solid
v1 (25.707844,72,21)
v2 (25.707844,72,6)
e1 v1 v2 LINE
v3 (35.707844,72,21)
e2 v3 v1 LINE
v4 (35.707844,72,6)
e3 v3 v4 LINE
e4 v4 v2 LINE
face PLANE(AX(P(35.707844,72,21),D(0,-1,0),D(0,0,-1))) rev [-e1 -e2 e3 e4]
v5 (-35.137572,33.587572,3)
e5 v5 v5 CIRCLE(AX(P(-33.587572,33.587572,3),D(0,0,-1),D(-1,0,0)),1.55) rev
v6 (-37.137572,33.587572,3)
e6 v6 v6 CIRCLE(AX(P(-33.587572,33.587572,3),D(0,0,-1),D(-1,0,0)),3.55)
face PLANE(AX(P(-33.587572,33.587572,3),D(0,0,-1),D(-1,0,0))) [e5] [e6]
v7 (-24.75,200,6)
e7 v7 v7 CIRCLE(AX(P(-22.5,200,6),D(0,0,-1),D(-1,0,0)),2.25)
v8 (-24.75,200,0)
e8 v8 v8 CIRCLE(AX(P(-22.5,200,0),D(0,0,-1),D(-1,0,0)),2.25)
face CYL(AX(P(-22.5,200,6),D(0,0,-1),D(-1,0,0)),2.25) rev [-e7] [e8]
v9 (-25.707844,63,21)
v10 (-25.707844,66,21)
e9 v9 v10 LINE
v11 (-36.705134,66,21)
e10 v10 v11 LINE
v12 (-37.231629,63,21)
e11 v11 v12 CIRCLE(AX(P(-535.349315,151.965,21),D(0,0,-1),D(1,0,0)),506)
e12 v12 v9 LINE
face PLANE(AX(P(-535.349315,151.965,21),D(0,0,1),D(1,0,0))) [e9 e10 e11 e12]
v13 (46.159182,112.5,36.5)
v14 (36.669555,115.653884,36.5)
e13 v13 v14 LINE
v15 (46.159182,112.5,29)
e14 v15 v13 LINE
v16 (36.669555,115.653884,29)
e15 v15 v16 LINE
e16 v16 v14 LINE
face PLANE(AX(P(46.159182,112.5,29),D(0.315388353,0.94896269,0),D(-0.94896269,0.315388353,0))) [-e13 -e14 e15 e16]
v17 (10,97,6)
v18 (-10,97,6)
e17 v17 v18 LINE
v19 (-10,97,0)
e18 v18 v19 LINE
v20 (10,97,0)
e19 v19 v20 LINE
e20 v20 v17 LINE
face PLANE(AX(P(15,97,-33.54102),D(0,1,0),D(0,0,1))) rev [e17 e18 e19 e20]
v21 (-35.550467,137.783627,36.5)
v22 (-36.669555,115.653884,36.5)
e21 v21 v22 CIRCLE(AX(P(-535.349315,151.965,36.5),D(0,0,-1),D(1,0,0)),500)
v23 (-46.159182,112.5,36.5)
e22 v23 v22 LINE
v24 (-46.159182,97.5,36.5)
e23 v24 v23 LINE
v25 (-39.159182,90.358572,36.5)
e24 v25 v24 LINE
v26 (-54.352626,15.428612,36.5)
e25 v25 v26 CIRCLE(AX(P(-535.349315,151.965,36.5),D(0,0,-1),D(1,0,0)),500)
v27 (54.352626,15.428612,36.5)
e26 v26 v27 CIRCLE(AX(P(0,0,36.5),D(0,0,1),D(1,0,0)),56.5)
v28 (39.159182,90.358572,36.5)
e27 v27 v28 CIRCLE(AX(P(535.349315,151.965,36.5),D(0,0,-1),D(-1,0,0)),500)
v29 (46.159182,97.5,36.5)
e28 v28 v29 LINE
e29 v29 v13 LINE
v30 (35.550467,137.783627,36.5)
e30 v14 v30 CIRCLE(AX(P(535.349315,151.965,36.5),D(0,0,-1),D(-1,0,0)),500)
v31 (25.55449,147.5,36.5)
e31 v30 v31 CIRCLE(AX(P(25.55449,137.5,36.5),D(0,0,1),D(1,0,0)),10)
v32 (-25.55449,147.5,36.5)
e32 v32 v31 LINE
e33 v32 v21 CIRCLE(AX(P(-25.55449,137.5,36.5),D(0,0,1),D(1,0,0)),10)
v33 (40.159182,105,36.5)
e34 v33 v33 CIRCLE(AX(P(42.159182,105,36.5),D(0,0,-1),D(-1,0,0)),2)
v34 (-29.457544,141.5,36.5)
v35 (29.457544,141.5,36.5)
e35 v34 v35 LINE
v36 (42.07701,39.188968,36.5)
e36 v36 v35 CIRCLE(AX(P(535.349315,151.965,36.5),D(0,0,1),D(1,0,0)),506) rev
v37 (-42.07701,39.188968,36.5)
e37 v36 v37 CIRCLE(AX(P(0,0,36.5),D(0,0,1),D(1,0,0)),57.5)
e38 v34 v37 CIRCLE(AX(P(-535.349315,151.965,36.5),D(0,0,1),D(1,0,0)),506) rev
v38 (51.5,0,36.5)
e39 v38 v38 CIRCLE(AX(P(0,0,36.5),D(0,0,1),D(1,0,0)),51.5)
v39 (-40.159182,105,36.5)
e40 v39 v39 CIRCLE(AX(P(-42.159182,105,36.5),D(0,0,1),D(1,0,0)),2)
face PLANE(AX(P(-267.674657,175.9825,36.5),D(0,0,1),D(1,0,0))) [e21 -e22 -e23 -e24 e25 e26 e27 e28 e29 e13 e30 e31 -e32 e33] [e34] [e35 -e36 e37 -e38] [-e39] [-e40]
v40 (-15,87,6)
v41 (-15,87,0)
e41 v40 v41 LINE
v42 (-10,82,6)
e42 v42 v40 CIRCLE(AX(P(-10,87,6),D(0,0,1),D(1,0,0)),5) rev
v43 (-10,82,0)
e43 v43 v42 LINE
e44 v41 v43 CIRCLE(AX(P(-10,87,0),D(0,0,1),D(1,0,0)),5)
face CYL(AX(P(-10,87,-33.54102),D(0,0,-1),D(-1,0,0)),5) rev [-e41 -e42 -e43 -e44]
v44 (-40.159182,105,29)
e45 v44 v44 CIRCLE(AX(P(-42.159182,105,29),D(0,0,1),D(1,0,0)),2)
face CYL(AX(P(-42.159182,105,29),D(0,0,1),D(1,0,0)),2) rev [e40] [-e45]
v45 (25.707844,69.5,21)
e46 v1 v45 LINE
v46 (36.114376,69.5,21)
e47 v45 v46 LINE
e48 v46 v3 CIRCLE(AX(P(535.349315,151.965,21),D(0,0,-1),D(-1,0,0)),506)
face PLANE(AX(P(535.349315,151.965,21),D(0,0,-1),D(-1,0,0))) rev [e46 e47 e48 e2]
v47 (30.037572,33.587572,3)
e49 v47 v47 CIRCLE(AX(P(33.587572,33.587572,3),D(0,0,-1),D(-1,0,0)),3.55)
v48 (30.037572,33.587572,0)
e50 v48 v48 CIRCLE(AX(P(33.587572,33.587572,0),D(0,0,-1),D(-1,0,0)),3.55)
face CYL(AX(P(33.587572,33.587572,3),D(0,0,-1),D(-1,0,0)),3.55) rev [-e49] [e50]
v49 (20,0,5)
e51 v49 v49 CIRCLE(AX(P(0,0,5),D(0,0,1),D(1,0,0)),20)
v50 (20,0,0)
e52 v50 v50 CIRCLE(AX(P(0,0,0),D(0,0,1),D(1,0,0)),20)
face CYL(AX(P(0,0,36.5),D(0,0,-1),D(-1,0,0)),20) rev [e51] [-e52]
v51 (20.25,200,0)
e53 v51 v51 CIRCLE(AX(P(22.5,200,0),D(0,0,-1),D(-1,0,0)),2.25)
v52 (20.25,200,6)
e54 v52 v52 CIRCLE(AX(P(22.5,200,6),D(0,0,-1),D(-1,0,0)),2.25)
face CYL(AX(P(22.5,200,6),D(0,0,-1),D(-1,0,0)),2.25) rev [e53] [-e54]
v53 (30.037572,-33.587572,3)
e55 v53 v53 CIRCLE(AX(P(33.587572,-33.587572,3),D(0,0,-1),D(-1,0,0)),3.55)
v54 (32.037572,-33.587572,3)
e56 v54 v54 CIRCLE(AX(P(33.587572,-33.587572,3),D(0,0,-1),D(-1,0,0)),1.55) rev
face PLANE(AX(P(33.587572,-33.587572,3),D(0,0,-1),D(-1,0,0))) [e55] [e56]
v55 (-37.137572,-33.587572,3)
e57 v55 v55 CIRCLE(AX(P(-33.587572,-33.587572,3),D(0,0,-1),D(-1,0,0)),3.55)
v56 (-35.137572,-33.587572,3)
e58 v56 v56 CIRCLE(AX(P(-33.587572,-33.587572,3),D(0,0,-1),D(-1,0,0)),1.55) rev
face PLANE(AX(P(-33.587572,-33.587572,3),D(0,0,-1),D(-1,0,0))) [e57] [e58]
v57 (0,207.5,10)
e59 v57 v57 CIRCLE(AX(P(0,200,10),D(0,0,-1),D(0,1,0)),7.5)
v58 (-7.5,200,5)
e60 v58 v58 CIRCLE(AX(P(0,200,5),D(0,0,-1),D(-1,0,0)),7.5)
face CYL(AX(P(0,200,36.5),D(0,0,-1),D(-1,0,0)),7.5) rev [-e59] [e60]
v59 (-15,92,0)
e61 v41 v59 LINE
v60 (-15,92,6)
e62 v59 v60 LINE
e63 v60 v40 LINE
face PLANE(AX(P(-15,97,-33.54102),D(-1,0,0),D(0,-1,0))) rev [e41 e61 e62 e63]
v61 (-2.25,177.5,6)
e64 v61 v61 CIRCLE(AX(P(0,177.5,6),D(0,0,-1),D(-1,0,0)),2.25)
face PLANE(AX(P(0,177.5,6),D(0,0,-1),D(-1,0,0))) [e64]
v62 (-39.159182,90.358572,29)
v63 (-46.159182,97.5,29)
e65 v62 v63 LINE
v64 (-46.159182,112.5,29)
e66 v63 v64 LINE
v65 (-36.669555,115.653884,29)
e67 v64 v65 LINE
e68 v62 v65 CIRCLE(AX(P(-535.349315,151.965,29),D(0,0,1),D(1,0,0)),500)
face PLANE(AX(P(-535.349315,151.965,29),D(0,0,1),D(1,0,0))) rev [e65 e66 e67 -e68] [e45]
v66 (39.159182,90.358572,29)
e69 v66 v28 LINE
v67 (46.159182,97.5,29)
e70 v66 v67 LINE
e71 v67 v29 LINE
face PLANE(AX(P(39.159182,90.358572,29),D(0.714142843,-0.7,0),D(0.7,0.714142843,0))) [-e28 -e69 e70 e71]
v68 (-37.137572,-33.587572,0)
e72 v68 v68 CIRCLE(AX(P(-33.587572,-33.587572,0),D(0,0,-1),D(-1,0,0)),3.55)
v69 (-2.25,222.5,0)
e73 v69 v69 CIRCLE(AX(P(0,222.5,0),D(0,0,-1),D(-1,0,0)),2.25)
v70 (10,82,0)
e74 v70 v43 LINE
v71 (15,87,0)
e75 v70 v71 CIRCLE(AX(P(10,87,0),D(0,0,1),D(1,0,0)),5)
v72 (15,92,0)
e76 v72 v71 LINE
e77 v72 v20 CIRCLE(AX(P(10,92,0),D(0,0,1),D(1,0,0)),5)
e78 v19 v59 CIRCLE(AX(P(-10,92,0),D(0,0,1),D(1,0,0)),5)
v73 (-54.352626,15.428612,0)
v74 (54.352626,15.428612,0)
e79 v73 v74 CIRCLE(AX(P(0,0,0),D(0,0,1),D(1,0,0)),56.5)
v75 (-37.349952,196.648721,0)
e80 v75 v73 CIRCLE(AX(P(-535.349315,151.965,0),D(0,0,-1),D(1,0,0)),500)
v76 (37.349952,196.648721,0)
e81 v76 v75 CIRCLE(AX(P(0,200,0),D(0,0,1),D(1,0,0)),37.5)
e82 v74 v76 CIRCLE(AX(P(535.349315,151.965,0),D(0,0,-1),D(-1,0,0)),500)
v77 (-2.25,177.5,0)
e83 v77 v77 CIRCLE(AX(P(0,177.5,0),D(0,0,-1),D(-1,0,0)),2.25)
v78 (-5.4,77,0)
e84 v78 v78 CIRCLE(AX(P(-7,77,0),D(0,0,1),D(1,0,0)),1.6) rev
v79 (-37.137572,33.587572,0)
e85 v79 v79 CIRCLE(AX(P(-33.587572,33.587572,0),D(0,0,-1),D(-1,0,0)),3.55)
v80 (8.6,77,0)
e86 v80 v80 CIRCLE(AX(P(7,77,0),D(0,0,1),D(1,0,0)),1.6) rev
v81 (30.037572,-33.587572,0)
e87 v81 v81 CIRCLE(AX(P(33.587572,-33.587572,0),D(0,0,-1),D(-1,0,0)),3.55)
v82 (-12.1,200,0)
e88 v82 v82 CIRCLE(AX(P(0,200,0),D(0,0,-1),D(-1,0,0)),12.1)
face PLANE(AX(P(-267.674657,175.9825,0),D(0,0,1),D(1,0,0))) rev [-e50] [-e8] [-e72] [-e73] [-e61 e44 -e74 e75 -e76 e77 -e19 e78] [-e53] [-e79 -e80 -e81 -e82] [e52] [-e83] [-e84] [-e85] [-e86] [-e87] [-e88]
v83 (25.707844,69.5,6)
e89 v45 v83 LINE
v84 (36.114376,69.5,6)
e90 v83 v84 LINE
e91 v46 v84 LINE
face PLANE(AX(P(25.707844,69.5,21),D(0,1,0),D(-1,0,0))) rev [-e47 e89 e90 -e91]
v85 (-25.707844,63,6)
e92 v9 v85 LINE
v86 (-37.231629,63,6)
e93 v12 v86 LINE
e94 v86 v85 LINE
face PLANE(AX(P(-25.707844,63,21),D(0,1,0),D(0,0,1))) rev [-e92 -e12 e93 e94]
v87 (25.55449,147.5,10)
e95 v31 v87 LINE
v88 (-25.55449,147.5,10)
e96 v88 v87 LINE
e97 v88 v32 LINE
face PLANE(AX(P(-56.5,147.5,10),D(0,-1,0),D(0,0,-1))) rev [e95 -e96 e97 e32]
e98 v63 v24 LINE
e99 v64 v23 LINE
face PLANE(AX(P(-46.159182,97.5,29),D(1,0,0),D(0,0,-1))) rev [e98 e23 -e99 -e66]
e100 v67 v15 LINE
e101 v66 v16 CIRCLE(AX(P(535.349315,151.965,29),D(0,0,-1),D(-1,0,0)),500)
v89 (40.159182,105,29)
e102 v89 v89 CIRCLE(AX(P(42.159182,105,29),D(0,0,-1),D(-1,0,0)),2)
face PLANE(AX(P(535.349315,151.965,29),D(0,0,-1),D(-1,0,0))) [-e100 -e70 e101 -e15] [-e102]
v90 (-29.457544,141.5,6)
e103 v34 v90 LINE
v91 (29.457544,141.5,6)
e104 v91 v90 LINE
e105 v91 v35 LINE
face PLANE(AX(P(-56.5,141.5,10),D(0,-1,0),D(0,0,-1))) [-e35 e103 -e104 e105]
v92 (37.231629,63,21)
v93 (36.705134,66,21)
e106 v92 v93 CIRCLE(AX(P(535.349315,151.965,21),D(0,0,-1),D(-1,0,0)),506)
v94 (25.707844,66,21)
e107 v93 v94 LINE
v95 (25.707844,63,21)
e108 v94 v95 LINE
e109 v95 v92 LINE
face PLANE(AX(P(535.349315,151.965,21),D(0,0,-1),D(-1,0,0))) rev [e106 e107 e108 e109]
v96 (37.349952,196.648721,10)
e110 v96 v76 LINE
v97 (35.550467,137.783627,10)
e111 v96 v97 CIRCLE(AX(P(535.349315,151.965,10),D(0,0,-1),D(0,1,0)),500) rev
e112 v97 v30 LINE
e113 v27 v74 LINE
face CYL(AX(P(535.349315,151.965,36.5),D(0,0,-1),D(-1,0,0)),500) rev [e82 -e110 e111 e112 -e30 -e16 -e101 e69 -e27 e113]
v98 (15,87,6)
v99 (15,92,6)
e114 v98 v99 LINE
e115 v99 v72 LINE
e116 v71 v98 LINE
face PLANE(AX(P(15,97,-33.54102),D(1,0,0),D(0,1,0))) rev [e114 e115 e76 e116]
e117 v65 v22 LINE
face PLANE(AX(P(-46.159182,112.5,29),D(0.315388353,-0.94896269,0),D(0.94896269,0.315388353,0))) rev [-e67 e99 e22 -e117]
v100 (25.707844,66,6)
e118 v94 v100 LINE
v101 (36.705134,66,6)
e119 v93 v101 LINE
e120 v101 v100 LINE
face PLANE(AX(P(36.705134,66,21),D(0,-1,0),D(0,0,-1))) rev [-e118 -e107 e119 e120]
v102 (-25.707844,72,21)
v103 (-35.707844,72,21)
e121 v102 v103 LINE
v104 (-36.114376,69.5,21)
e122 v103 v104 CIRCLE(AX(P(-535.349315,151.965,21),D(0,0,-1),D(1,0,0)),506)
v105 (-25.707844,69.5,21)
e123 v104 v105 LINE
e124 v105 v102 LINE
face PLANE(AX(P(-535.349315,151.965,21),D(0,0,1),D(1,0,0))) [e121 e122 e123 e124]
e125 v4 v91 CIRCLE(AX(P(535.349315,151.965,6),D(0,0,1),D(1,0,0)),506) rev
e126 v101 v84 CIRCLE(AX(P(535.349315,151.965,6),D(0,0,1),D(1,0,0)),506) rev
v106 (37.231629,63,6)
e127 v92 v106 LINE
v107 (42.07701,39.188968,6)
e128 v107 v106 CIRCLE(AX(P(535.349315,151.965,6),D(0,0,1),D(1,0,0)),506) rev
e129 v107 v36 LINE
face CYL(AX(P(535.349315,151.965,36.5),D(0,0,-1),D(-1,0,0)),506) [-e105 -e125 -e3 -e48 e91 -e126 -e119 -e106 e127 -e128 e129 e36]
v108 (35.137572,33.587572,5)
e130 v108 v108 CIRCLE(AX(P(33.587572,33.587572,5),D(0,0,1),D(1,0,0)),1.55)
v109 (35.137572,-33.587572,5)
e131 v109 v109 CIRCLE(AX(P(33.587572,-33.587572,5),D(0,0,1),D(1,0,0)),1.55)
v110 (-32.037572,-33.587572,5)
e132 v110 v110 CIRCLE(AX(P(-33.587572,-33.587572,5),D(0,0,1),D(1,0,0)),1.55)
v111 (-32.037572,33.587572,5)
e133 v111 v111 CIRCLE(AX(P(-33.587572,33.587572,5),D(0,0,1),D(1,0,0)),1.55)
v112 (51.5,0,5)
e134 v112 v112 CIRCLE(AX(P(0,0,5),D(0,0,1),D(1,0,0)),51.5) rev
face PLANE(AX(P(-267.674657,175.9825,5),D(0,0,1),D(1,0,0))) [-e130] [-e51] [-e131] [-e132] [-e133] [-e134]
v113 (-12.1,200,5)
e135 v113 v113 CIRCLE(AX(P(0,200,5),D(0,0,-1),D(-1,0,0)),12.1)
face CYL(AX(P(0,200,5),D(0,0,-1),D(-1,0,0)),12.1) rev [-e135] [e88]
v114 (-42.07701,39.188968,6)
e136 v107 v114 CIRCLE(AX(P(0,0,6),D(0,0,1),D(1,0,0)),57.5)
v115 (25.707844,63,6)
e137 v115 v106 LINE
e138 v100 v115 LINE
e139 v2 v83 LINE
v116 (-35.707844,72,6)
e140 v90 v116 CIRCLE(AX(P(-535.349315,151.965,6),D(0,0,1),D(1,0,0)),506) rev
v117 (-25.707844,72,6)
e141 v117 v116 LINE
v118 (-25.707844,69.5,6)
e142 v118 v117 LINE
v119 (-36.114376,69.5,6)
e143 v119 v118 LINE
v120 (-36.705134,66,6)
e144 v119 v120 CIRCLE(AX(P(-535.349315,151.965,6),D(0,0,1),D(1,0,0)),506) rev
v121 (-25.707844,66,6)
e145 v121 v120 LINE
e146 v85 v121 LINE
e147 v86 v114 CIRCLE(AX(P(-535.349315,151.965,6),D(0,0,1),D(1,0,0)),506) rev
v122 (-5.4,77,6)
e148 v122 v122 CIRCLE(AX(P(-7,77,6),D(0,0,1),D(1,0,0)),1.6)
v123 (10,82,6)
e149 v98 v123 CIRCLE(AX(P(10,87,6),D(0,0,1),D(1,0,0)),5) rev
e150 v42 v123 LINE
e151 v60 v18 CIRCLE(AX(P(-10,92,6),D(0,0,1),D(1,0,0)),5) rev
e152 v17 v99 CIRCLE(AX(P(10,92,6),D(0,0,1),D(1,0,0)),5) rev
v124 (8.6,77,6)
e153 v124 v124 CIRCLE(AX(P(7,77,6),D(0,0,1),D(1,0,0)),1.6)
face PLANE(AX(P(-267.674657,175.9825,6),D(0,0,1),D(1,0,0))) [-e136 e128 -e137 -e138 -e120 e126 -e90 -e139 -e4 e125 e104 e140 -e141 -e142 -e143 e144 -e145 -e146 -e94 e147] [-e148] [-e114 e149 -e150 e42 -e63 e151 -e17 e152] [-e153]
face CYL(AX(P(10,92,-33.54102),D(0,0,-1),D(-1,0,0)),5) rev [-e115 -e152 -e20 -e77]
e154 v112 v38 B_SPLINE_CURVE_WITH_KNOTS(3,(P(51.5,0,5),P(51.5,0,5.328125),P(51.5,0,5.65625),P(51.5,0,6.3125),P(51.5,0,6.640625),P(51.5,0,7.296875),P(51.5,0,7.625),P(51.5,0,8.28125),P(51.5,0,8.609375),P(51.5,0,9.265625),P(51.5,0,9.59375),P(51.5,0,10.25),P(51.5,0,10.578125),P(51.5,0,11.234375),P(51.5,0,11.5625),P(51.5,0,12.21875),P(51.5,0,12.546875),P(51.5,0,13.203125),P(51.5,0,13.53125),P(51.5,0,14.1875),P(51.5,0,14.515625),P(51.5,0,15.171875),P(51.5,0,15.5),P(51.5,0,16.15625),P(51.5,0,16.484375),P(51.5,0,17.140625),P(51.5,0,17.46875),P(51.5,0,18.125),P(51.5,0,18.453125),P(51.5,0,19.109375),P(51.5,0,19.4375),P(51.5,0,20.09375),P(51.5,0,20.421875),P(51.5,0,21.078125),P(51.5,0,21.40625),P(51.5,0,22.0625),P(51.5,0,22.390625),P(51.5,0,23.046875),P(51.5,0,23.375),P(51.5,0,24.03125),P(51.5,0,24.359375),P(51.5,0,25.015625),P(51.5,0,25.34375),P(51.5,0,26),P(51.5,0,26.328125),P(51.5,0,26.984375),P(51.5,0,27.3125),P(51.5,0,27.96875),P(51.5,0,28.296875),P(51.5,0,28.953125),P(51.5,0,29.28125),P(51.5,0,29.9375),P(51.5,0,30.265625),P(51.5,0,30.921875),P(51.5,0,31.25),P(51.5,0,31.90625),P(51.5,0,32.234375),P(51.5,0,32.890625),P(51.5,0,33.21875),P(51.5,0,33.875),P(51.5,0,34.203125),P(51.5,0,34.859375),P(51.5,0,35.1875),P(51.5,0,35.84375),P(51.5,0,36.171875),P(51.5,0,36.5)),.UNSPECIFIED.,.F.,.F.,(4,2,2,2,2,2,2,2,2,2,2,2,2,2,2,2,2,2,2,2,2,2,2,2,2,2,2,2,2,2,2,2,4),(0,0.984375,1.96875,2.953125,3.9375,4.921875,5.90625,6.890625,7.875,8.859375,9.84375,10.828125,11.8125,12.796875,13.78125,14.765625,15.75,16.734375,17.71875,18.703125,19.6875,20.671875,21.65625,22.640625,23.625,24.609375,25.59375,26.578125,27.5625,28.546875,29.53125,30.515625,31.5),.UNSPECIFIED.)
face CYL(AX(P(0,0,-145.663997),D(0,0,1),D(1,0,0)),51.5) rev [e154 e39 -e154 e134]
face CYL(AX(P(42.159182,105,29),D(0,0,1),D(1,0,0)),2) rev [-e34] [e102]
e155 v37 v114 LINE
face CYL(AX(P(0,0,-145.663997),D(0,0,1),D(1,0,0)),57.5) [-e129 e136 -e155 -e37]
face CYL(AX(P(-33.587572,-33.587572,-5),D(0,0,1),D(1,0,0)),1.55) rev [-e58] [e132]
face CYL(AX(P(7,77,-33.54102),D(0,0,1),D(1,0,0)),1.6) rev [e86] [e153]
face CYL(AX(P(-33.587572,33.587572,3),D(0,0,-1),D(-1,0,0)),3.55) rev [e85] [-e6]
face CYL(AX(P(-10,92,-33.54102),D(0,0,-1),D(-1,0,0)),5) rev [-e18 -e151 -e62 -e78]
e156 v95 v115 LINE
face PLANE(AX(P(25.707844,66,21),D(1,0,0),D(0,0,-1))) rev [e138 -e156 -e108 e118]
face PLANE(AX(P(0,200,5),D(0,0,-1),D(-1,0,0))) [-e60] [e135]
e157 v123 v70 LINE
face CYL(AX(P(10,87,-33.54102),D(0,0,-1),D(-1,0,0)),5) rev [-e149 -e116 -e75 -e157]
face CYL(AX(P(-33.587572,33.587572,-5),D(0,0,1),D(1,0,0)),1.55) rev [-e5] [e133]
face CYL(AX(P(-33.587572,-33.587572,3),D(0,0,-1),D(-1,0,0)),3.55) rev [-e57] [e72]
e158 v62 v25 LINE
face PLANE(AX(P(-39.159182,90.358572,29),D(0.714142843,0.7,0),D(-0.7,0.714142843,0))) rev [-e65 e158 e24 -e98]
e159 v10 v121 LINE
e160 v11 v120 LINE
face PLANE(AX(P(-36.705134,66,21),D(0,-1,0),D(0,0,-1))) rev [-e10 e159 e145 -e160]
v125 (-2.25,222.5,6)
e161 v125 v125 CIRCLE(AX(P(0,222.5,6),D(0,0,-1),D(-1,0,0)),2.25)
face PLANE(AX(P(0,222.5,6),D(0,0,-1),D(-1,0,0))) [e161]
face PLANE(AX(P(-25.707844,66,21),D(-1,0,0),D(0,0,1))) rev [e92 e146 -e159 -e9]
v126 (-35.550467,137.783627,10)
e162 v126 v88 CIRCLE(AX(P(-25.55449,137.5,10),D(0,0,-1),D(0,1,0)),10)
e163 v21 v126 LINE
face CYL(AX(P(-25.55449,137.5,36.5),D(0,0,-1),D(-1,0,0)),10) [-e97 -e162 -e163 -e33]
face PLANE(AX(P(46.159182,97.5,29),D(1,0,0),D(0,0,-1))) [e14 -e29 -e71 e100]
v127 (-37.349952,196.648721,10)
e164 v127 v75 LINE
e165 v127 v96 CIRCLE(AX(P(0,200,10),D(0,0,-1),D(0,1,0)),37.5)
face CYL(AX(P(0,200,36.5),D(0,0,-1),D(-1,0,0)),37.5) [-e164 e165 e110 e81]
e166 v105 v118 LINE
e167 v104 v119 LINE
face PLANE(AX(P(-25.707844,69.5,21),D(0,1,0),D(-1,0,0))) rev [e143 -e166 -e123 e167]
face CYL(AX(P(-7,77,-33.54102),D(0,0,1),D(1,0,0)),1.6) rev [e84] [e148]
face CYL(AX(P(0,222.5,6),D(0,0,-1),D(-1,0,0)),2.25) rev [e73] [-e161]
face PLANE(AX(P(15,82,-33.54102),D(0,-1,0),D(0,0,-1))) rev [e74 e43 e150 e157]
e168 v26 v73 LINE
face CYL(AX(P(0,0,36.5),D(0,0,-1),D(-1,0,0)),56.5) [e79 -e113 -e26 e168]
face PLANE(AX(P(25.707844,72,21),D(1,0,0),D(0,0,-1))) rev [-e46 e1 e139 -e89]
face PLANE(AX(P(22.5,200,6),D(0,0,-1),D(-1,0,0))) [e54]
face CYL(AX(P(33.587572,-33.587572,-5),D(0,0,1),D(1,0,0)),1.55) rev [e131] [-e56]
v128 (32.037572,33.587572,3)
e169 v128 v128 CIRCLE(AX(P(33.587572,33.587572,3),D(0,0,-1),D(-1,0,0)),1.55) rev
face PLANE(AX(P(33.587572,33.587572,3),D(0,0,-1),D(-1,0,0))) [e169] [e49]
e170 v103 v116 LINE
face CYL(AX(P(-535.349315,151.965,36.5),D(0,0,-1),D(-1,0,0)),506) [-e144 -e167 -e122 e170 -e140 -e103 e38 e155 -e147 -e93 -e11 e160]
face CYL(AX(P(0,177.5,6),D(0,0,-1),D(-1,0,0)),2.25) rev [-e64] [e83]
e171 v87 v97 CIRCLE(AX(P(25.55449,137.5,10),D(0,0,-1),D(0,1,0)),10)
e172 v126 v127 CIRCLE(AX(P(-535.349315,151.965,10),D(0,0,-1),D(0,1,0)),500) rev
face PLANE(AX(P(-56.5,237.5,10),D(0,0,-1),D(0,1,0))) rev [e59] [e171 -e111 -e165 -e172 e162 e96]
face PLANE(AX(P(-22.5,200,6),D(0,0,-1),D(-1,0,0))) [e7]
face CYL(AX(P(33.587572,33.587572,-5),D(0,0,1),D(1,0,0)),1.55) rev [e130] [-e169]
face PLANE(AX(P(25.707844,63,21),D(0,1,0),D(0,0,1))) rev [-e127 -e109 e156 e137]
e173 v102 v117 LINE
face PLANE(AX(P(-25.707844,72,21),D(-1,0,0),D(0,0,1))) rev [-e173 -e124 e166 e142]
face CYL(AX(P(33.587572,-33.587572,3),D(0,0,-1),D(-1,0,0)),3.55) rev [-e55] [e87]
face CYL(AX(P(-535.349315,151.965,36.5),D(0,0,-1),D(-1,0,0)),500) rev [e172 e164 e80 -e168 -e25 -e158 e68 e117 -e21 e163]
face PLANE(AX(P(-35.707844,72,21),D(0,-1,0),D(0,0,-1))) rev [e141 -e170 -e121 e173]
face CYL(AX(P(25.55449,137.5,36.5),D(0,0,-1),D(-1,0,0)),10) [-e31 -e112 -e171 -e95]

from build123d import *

# Parameters (mm, degrees)
SKETCH1_R               = 20
SKETCH1_R_2             = 7.5
BOSS_EXTRUDE1_DEPTH     = 36.5
SKETCH4_R               = 51.5
CUT_EXTRUDE3_DEPTH      = 31.5
CUT_EXTRUDE4_DEPTH      = 247.841548367
CUT_EXTRUDE4_DEPTH_BACK = 247.841548367
SKETCH5_W               = 26.5
SKETCH5_H               = 90
SHELL1_START            = 6
SHELL1_DEPTH            = 30.5
BOSS_EXTRUDE2_START     = -7.5
SKETCH7_R               = 2
BOSS_EXTRUDE2_DEPTH     = 7.5
BOSS_EXTRUDE3_DEPTH     = 15
CUT_EXTRUDE5_DEPTH      = 247.025913269
CUT_EXTRUDE5_DEPTH_BACK = 6
SKETCH9_R               = 1.6
SKETCH9_W               = 30
SKETCH9_H               = 15
FILLET1_R               = 10
FILLET2_R               = 5
SKETCH10_R              = 1.55
CUT_EXTRUDE6_DEPTH      = 10
SKETCH11_OUTSIDE_W      = 178.416
SKETCH11_OUTSIDE_H      = 359.416
SKETCH11_OUTSIDE_R      = 3.55
CUT_EXTRUDE8_DEPTH      = 3
SKETCH12_R              = 12.1
CUT_EXTRUDE9_DEPTH      = 5
SKETCH13_R              = 2.25
CUT_EXTRUDE10_DEPTH     = 6


# Read off the part's stored shape, not the designer's step: Shell1
with BuildPart() as part:
    # Sketch1 → Boss-Extrude1 (new body)
    with BuildSketch(Plane.XY):
        with BuildLine():
            ThreePointArc((-54.352625843, 15.42861186), (0, -56.5), (54.352625843, 15.42861186))
            ThreePointArc((54.352625843, 15.42861186), (37.535595393, 105.258460348), (37.34995219, 196.64872093))
            ThreePointArc((37.34995219, 196.64872093), (0, 237.5), (-37.34995219, 196.64872093))
            ThreePointArc((-37.34995219, 196.64872093), (-37.535595393, 105.258460348), (-54.352625843, 15.42861186))
        make_face()
        Circle(SKETCH1_R, mode=Mode.SUBTRACT)
        with Locations((0, 200)):
            Circle(SKETCH1_R_2, mode=Mode.SUBTRACT)
    extrude(amount=BOSS_EXTRUDE1_DEPTH)

    # Sketch4 → Cut-Extrude3 (cut)
    with BuildSketch(Plane.XY.offset(36.5)):
        Circle(SKETCH4_R)
    extrude(amount=-CUT_EXTRUDE3_DEPTH, mode=Mode.SUBTRACT)

    # Sketch5 → Cut-Extrude4 (cut, two sides: drawn at the far end of the back side and taken through both)
    with BuildSketch(Plane(origin=(0, 0, 0), x_dir=(0, 0, -1), z_dir=(1, 0, 0)).offset(-CUT_EXTRUDE4_DEPTH_BACK)):
        with Locations((-23.25, 192.5)):
            Rectangle(SKETCH5_W, SKETCH5_H)
    extrude(amount=CUT_EXTRUDE4_DEPTH + CUT_EXTRUDE4_DEPTH_BACK, mode=Mode.SUBTRACT)

    # Shell1 outline → Shell1 (cut)
    with BuildSketch(Plane.XY.offset(SHELL1_START)):
        with BuildLine():
            ThreePointArc((-42.077009937, 39.188968279), (0, 57.5), (42.077009937, 39.188968279))
            ThreePointArc((42.077009937, 39.188968279), (33.155030313, 90.022278833), (29.457543912, 141.5))
            Line((29.457543912, 141.5), (-29.457543912, 141.5))
            ThreePointArc((-29.457543912, 141.5), (-33.155030313, 90.022278833), (-42.077009937, 39.188968279))
        make_face()
    extrude(amount=SHELL1_DEPTH, mode=Mode.SUBTRACT)

    # Sketch7 → Boss-Extrude2 (add)
    # profile 1 of 2: a face of its own
    with BuildSketch(Plane.XY.offset(36.5).offset(BOSS_EXTRUDE2_START)):
        with BuildLine():
            Line((-39.159181835, 90.358571571), (-46.159181835, 97.5))
            Line((-46.159181835, 97.5), (-46.159181835, 112.5))
            Line((-46.159181835, 112.5), (-36.669554937, 115.653883533))
            ThreePointArc((-36.669554937, 115.653883533), (-37.753606302, 102.990404952), (-39.159181835, 90.358571571))
        make_face()
        with Locations((-42.159181835, 105)):
            Circle(SKETCH7_R, mode=Mode.SUBTRACT)
    # profile 2 of 2: a face of its own
    with BuildSketch(Plane.XY.offset(36.5).offset(BOSS_EXTRUDE2_START)):
        with BuildLine():
            Line((46.159181835, 97.5), (46.159181835, 112.5))
            Line((46.159181835, 112.5), (36.669554937, 115.653883533))
            ThreePointArc((36.669554937, 115.653883533), (37.753606302, 102.990404952), (39.159181835, 90.358571571))
            Line((39.159181835, 90.358571571), (46.159181835, 97.5))
        make_face()
        with Locations(Location((42.159181835, 105, 0), (0, 0, 180))):
            Circle(SKETCH7_R, mode=Mode.SUBTRACT)
    extrude(amount=BOSS_EXTRUDE2_DEPTH)

    # Sketch8 → Boss-Extrude3 (add)
    with BuildSketch(Plane.XY.offset(6)):
        with BuildLine():
            Line((-35.707844492, 72), (-25.707844492, 72))
            Line((-25.707844492, 72), (-25.707844492, 69.5))
            Line((-25.707844492, 69.5), (-36.114376268, 69.5))
            ThreePointArc((-36.114376268, 69.5), (-35.909546125, 70.749745632), (-35.707844492, 72))
        make_face()
        with BuildLine():
            Line((-36.705134195, 66), (-25.707844492, 66))
            Line((-25.707844492, 66), (-25.707844492, 63))
            Line((-25.707844492, 63), (-37.231629056, 63))
            ThreePointArc((-37.231629056, 63), (-36.966124321, 64.499603847), (-36.705134195, 66))
        make_face()
        with BuildLine():
            Line((25.707844492, 63), (37.231629056, 63))
            ThreePointArc((37.231629056, 63), (36.966124321, 64.499603847), (36.705134195, 66))
            Line((36.705134195, 66), (25.707844492, 66))
            Line((25.707844492, 66), (25.707844492, 63))
        make_face()
        with BuildLine():
            Line((25.707844492, 69.5), (36.114376268, 69.5))
            ThreePointArc((36.114376268, 69.5), (35.909546125, 70.749745632), (35.707844492, 72))
            Line((35.707844492, 72), (25.707844492, 72))
            Line((25.707844492, 72), (25.707844492, 69.5))
        make_face()
    extrude(amount=BOSS_EXTRUDE3_DEPTH)

    # Sketch9 → Cut-Extrude5 (cut, two sides: drawn at the far end of the back side and taken through both)
    with BuildSketch(Plane.XY.offset(6).offset(-CUT_EXTRUDE5_DEPTH_BACK)):
        with Locations((-7, 77)):
            Circle(SKETCH9_R)
        with Locations((7, 77)):
            Circle(SKETCH9_R)
        with Locations((0, 89.5)):
            Rectangle(SKETCH9_W, SKETCH9_H)
    extrude(amount=CUT_EXTRUDE5_DEPTH + CUT_EXTRUDE5_DEPTH_BACK, mode=Mode.SUBTRACT)

    # Fillet1
    fillet1_edges = [part.edges().sort_by_distance(p)[0] for p in [
        (35.369251346, 147.5, 23.25),
        (-35.369251346, 147.5, 23.25),
    ]]
    fillet(fillet1_edges, radius=FILLET1_R)

    # Fillet2
    fillet2_edges = [part.edges().sort_by_distance(p)[0] for p in [
        (15, 97, 3),
        (15, 82, 3),
        (-15, 82, 3),
        (-15, 97, 3),
    ]]
    fillet(fillet2_edges, radius=FILLET2_R)

    # Sketch10 → Cut-Extrude6 (cut)
    with BuildSketch(Plane.XY.offset(5)):
        with Locations((-33.587572106, 33.587572106)):
            Circle(SKETCH10_R)
        with Locations((33.587572106, 33.587572106)):
            Circle(SKETCH10_R)
        with Locations((33.587572106, -33.587572106)):
            Circle(SKETCH10_R)
        with Locations((-33.587572106, -33.587572106)):
            Circle(SKETCH10_R)
    extrude(amount=-CUT_EXTRUDE6_DEPTH, mode=Mode.SUBTRACT)

    # Sketch11 outside → Cut-Extrude8 (cut)
    # profile 1 of 5: a face of its own
    with BuildSketch(Plane(origin=(0, 0, 0), x_dir=(-1, 0, 0), z_dir=(0, 0, -1))):
        with Locations((0, 90.5)):
            Rectangle(SKETCH11_OUTSIDE_W, SKETCH11_OUTSIDE_H)
        with BuildLine():
            ThreePointArc((37.34995219, 196.64872093), (37.535595393, 105.258460348), (54.352625843, 15.42861186))
            ThreePointArc((54.352625843, 15.42861186), (0, -56.5), (-54.352625843, 15.42861186))
            ThreePointArc((-54.352625843, 15.42861186), (-37.535595393, 105.258460348), (-37.34995219, 196.64872093))
            ThreePointArc((-37.34995219, 196.64872093), (0, 237.5), (37.34995219, 196.64872093))
        make_face(mode=Mode.SUBTRACT)
    # profile 2 of 5: a face of its own
    with BuildSketch(Plane(origin=(0, 0, 0), x_dir=(-1, 0, 0), z_dir=(0, 0, -1))):
        with Locations((-33.587572106, -33.587572106)):
            Circle(SKETCH11_OUTSIDE_R)
    # profile 3 of 5: a face of its own
    with BuildSketch(Plane(origin=(0, 0, 0), x_dir=(-1, 0, 0), z_dir=(0, 0, -1))):
        with Locations((33.587572106, -33.587572106)):
            Circle(SKETCH11_OUTSIDE_R)
    # profile 4 of 5: a face of its own
    with BuildSketch(Plane(origin=(0, 0, 0), x_dir=(-1, 0, 0), z_dir=(0, 0, -1))):
        with Locations((33.587572106, 33.587572106)):
            Circle(SKETCH11_OUTSIDE_R)
    # profile 5 of 5: a face of its own
    with BuildSketch(Plane(origin=(0, 0, 0), x_dir=(-1, 0, 0), z_dir=(0, 0, -1))):
        with Locations((-33.587572106, 33.587572106)):
            Circle(SKETCH11_OUTSIDE_R)
    extrude(amount=-CUT_EXTRUDE8_DEPTH, mode=Mode.SUBTRACT)

    # Sketch12 → Cut-Extrude9 (cut)
    with BuildSketch(Plane(origin=(0, 0, 0), x_dir=(-1, 0, 0), z_dir=(0, 0, -1))):
        with Locations((0, 200)):
            Circle(SKETCH12_R)
    extrude(amount=-CUT_EXTRUDE9_DEPTH, mode=Mode.SUBTRACT)

    # Sketch13 → Cut-Extrude10 (cut)
    with BuildSketch(Plane(origin=(0, 0, 0), x_dir=(-1, 0, 0), z_dir=(0, 0, -1))):
        with Locations((0, 222.5)):
            Circle(SKETCH13_R)
        with Locations((22.5, 200)):
            Circle(SKETCH13_R)
        with Locations((0, 177.5)):
            Circle(SKETCH13_R)
        with Locations((-22.5, 200)):
            Circle(SKETCH13_R)
    extrude(amount=-CUT_EXTRUDE10_DEPTH, mode=Mode.SUBTRACT)


solid = part.part
